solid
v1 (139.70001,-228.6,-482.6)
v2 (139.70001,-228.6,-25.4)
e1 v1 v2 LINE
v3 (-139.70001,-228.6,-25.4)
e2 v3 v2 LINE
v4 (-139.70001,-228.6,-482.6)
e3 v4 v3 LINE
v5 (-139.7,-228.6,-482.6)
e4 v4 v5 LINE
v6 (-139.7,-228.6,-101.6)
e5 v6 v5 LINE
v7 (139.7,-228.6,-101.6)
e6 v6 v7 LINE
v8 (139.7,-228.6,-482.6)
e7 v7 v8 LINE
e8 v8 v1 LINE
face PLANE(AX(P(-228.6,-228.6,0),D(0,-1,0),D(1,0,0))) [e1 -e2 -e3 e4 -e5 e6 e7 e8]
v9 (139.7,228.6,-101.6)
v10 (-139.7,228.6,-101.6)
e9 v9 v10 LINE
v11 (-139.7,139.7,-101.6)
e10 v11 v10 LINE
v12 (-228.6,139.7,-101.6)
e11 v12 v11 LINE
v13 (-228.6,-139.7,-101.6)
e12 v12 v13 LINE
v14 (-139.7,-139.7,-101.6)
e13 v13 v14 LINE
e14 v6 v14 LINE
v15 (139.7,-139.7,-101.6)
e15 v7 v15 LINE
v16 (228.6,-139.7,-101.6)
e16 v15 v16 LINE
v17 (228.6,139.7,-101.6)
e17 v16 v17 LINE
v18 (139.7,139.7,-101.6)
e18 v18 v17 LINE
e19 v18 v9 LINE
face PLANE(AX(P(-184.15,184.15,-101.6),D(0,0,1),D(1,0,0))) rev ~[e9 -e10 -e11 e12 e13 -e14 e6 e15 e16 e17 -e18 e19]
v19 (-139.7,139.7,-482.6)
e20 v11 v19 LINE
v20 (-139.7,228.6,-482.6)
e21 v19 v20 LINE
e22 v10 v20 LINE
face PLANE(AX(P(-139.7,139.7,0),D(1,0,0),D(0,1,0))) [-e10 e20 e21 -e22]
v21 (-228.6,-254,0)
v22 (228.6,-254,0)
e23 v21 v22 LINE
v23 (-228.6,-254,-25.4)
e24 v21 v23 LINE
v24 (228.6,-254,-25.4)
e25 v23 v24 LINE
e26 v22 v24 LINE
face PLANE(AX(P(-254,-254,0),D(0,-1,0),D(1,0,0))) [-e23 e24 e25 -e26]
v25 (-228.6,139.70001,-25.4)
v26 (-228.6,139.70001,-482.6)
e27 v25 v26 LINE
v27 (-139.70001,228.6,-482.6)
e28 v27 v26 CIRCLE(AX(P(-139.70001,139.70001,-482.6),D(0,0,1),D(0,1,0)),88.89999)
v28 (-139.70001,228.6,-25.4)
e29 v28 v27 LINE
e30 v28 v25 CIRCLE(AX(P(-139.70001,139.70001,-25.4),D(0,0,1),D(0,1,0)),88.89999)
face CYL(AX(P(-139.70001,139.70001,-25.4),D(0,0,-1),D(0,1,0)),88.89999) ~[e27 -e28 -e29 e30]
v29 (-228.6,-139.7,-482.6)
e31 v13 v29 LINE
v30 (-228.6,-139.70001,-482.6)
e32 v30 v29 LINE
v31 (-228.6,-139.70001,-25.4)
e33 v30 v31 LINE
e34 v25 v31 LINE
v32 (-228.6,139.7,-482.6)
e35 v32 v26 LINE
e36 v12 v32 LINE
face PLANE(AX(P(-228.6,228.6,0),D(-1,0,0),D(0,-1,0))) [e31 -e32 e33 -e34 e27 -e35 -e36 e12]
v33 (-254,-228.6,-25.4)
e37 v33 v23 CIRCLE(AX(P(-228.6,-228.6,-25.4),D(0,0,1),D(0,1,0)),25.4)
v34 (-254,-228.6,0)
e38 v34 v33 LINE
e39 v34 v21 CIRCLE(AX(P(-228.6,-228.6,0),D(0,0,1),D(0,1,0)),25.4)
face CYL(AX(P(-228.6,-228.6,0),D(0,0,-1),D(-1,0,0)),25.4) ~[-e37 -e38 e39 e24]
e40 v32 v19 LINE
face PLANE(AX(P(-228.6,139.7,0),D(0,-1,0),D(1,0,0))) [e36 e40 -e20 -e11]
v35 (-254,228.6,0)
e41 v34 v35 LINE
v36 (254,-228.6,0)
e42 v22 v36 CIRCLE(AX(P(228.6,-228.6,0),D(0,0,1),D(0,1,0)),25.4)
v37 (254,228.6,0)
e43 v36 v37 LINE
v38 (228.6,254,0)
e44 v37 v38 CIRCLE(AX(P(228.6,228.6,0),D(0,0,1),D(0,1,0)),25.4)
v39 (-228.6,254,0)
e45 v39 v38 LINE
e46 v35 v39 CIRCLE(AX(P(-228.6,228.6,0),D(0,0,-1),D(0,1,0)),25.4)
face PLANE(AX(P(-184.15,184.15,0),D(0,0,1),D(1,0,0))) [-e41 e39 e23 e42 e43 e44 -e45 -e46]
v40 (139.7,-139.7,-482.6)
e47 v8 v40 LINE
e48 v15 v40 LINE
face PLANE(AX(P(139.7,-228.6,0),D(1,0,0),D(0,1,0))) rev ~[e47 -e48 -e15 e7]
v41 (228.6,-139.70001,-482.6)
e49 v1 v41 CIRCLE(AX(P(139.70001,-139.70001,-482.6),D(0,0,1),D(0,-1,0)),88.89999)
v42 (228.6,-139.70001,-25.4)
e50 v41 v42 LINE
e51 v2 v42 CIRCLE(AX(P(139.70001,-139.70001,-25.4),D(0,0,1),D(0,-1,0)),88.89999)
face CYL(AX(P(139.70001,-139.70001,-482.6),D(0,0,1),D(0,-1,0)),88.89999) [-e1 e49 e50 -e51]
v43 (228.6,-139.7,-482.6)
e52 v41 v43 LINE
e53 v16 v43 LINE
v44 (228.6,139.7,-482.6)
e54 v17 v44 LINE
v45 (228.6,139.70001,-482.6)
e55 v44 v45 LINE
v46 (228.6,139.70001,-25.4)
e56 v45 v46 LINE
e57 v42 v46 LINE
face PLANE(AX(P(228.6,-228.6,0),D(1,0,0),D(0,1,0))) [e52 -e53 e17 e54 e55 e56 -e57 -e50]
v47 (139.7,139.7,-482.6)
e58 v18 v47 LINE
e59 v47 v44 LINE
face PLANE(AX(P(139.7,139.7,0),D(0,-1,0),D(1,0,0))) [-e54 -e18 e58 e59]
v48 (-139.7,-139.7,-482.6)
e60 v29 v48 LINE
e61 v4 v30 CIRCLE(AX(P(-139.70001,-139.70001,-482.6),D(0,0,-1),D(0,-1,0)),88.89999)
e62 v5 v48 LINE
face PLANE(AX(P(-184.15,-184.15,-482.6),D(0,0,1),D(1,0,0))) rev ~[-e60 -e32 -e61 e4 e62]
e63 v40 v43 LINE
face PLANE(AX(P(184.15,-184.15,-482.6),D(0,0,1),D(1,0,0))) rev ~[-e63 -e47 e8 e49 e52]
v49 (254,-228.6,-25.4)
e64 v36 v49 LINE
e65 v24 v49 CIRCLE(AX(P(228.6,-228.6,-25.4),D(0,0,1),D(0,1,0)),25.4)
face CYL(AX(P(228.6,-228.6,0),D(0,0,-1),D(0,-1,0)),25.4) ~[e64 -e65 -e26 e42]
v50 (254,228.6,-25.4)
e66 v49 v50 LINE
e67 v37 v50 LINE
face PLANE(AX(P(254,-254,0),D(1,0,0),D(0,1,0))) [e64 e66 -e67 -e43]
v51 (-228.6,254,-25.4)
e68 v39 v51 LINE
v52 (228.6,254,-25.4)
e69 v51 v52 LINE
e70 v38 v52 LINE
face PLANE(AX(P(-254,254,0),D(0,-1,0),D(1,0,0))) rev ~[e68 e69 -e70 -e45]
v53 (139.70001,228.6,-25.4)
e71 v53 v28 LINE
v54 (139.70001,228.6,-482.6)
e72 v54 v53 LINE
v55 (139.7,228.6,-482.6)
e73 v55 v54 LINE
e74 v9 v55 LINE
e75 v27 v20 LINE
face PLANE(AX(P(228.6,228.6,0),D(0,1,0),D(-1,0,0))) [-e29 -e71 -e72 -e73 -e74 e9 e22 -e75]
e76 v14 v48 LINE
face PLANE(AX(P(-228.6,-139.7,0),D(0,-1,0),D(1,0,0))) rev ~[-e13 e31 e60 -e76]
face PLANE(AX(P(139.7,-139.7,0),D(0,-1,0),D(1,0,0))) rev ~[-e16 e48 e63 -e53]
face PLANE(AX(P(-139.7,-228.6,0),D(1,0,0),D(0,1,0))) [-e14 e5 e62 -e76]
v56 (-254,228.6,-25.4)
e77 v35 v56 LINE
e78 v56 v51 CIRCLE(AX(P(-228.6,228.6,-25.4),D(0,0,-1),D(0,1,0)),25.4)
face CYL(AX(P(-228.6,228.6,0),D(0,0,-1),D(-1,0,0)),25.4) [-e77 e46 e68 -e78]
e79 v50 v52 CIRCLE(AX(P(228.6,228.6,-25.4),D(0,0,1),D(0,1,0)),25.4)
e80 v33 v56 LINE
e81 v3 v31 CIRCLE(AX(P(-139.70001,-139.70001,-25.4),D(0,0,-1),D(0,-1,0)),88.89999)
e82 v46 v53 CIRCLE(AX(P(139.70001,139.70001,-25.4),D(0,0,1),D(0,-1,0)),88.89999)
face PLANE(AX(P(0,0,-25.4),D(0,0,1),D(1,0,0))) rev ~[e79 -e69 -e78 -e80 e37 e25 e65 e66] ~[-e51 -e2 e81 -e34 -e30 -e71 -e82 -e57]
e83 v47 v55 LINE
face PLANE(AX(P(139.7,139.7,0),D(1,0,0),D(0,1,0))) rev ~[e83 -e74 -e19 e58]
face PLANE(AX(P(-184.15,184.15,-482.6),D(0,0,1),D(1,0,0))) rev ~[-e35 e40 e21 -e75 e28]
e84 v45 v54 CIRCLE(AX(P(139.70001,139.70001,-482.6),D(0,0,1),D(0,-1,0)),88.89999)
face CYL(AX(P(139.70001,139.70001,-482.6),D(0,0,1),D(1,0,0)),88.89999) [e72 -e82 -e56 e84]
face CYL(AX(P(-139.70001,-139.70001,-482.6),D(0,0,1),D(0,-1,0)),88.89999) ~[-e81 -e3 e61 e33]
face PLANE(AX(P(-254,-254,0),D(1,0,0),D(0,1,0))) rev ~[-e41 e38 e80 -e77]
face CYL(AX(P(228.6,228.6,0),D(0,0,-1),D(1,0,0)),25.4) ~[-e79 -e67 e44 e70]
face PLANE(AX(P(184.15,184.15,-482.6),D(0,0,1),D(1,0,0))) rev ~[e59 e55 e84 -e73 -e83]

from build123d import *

# Parameters (mm, degrees)
F0_W     = 508
F0_H     = 508
F0_W_2   = 88.9
F0_H_2   = 88.9
F1_DEPTH = 25.4
F2_DEPTH = 101.6
F3_DEPTH = 482.6
F4_R     = 88.89999
F5_R     = 25.4


# Not quite as in the source:
# - a fillet or chamfer is up to 0.001 mm smaller than in the source, because OpenCascade refuses the exact size


with BuildPart() as f1:
    # F0 (on Top) → F1 (new body)
    with BuildSketch(Plane.XY):
        Rectangle(F0_W, F0_H)
        Polygon((139.7, 228.6), (228.6, 228.6), (228.6, 139.7), (228.6, -139.7), (228.6, -228.6), (139.7, -228.6), (-139.7, -228.6), (-228.6, -228.6), (-228.6, -139.7), (-228.6, 139.7), (-228.6, 228.6), (-139.7, 228.6), align=None, mode=Mode.SUBTRACT)
        with Locations((-184.15, -184.15)):
            Rectangle(F0_W_2, F0_H_2)
        with Locations((184.15, -184.15)):
            Rectangle(F0_W_2, F0_H_2)
        with Locations((184.15, 184.15)):
            Rectangle(F0_W_2, F0_H_2)
        with Locations((-184.15, 184.15)):
            Rectangle(F0_W_2, F0_H_2)
        Polygon((139.7, 139.7), (139.7, 228.6), (-139.7, 228.6), (-139.7, 139.7), (-228.6, 139.7), (-228.6, -139.7), (-139.7, -139.7), (-139.7, -228.6), (139.7, -228.6), (139.7, -139.7), (228.6, -139.7), (228.6, 139.7), align=None)
    extrude(amount=-F1_DEPTH)

    # F0 (on Top) → F2 (join)
    with BuildSketch(Plane.XY):
        with Locations((-184.15, 184.15)):
            Rectangle(F0_W_2, F0_H_2)
        Polygon((139.7, 139.7), (139.7, 228.6), (-139.7, 228.6), (-139.7, 139.7), (-228.6, 139.7), (-228.6, -139.7), (-139.7, -139.7), (-139.7, -228.6), (139.7, -228.6), (139.7, -139.7), (228.6, -139.7), (228.6, 139.7), align=None)
        with Locations((184.15, 184.15)):
            Rectangle(F0_W_2, F0_H_2)
        with Locations((184.15, -184.15)):
            Rectangle(F0_W_2, F0_H_2)
        with Locations((-184.15, -184.15)):
            Rectangle(F0_W_2, F0_H_2)
    extrude(amount=-F2_DEPTH)

    # F0 (on Top) → F3 (join)
    with BuildSketch(Plane.XY):
        with Locations((-184.15, 184.15)):
            Rectangle(F0_W_2, F0_H_2)
        with Locations((-184.15, -184.15)):
            Rectangle(F0_W_2, F0_H_2)
        with Locations((184.15, 184.15)):
            Rectangle(F0_W_2, F0_H_2)
        with Locations((184.15, -184.15)):
            Rectangle(F0_W_2, F0_H_2)
    extrude(amount=-F3_DEPTH)

    # F4 (radius 88.9 in the source; OpenCascade refuses exactly that, so slightly less here)
    f4_edges = [f1.edges().sort_by_distance(p)[0] for p in [
        (-228.6, -228.6, -254),
        (228.6, -228.6, -254),
        (228.6, 228.6, -254),
        (-228.6, 228.6, -254),
    ]]
    fillet(f4_edges, radius=F4_R)

    # F5
    f5_edges = [f1.edges().sort_by_distance(p)[0] for p in [
        (254, -254, -12.7),
        (254, 254, -12.7),
        (-254, 254, -12.7),
        (-254, -254, -12.7),
    ]]
    fillet(f5_edges, radius=F5_R)


solid = f1.part
